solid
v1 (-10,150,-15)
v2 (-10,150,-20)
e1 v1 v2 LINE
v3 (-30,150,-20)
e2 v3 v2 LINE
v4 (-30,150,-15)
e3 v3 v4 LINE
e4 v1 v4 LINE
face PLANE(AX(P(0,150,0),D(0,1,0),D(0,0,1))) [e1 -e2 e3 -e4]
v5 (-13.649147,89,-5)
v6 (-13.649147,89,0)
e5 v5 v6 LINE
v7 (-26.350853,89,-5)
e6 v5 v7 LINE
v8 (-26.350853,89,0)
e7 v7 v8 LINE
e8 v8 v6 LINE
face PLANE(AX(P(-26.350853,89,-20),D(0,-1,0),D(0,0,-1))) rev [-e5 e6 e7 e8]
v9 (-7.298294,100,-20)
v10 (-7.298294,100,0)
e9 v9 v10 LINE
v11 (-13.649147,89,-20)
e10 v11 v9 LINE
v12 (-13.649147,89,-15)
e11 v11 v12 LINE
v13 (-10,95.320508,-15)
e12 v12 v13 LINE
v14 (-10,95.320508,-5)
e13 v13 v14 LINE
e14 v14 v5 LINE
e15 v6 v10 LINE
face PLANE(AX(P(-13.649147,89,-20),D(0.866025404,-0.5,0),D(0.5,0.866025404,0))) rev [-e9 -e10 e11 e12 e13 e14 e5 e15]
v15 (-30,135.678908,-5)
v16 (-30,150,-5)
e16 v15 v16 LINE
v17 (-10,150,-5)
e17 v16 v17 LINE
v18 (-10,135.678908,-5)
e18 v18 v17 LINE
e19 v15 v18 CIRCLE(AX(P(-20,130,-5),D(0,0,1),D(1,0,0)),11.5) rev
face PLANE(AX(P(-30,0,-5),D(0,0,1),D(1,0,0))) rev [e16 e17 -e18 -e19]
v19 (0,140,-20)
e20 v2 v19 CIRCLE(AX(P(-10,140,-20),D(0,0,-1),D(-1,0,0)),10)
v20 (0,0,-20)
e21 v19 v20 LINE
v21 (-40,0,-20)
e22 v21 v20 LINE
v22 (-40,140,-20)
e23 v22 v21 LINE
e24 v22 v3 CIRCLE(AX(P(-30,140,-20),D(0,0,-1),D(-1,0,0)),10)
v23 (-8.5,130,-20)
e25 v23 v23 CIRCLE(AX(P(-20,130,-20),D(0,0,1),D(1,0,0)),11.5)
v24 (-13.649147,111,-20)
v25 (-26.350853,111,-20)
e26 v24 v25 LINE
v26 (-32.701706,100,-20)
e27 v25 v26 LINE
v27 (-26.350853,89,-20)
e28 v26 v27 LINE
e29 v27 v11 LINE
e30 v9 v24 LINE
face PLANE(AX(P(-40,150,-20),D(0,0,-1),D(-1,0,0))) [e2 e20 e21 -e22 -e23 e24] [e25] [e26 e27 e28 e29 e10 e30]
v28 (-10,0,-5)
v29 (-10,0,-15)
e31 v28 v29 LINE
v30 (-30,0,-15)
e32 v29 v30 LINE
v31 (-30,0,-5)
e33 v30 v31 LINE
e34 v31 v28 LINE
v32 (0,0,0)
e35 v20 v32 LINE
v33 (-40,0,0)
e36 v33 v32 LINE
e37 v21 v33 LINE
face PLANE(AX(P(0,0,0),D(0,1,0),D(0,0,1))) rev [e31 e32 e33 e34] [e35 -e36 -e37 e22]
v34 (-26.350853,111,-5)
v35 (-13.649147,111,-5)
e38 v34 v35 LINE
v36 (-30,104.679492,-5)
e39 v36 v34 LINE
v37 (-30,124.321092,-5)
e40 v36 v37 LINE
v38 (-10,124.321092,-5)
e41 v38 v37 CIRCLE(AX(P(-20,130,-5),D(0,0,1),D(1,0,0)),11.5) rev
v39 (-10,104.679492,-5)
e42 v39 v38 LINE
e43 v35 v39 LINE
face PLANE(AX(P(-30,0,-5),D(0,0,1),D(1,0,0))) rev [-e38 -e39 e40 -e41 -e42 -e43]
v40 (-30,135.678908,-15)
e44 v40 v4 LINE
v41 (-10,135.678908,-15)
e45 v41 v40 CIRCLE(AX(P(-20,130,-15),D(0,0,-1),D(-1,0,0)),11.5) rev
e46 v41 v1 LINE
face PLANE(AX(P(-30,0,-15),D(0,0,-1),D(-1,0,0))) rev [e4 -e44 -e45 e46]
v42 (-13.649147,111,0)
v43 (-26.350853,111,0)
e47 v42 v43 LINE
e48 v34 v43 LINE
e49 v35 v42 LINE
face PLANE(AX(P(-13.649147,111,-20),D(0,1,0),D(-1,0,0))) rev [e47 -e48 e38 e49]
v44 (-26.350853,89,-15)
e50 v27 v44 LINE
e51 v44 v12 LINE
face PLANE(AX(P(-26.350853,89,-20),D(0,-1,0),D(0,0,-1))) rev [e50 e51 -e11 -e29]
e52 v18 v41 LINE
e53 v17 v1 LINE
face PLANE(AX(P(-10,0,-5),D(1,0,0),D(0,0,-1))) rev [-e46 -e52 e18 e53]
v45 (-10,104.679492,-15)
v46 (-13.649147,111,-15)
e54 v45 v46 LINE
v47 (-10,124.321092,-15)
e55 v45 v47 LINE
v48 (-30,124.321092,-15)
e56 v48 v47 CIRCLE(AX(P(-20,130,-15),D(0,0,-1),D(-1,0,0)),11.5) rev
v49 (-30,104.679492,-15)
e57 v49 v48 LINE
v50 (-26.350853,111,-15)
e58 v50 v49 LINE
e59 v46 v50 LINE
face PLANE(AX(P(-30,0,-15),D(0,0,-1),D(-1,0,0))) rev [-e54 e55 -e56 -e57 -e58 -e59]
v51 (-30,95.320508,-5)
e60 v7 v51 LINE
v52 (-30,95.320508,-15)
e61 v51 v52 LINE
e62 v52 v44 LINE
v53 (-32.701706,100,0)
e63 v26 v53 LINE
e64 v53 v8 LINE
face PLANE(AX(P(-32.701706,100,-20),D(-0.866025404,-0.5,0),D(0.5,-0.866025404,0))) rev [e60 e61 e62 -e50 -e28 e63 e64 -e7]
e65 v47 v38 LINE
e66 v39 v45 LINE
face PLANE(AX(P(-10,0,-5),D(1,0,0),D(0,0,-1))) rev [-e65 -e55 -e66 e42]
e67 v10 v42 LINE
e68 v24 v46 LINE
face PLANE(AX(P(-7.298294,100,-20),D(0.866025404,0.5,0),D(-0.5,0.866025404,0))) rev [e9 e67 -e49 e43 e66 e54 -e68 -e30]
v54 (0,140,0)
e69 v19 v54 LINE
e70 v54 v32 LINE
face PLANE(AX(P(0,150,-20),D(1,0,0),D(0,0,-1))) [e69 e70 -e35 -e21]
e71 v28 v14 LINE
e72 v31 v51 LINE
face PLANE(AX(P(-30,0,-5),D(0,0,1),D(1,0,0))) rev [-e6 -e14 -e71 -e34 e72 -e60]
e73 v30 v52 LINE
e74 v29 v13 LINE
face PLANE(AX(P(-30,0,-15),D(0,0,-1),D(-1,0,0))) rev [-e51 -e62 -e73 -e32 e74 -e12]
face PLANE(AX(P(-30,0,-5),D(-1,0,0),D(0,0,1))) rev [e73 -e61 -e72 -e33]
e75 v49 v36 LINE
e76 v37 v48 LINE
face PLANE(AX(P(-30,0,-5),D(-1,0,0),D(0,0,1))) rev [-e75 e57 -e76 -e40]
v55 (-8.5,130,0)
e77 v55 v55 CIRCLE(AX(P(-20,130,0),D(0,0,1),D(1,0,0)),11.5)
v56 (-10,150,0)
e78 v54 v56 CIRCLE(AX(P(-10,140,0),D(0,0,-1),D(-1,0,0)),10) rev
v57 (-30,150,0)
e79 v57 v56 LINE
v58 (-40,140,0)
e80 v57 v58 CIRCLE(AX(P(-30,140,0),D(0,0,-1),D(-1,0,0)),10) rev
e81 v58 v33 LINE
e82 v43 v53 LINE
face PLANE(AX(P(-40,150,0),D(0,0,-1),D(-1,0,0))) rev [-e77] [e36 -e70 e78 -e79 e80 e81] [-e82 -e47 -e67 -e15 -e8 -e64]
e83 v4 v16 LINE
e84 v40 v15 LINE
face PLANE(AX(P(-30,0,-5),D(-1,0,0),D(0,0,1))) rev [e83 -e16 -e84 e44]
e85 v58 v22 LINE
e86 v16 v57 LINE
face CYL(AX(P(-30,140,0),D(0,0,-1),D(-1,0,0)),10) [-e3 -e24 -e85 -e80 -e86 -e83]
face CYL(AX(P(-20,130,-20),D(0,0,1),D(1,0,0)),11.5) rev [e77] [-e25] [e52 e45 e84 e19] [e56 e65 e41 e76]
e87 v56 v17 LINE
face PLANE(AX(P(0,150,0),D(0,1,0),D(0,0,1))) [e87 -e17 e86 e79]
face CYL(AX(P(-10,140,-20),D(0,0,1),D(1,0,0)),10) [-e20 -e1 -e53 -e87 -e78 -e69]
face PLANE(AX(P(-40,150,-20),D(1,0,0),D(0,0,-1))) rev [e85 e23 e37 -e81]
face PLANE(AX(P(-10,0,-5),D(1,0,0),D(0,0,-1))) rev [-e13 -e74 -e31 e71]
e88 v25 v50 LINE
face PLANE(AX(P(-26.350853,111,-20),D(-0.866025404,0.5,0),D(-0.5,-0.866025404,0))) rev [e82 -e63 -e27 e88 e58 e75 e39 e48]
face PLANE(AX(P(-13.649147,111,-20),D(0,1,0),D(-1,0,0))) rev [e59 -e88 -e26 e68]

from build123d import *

# Parameters (mm, degrees)
ESQUISSE1_W                  = 40
ESQUISSE1_H                  = 20
BOSS_EXTRU_2_DEPTH           = 150
ESQUISSE2_R                  = 11.5
ENL_V_MAT_EXTRU_1_DEPTH      = 157.524758425
ENL_V_MAT_EXTRU_2_DEPTH      = 157.524758425
ENL_V_MAT_EXTRU_3_DEPTH      = 157.524758425
ENL_V_MAT_EXTRU_3_DEPTH_BACK = 157.524758425
ESQUISSE4_W                  = 20
ESQUISSE4_H                  = 10
CONG_2_R                     = 10
CONG_5_R                     = 10


with BuildPart() as part:
    # Esquisse1 → Boss.-Extru.2 (new body)
    with BuildSketch(Plane(origin=(0, 0, 0), x_dir=(1, 0, 0), z_dir=(0, 1, 0))):
        with Locations((-20, 10)):
            Rectangle(ESQUISSE1_W, ESQUISSE1_H)
    extrude(amount=BOSS_EXTRU_2_DEPTH)

    # Esquisse2 → Enlèv. mat.-Extru.1 (cut, through all)
    with BuildSketch(Plane.XY):
        with Locations((-20, 130)):
            Circle(ESQUISSE2_R)
    extrude(amount=-ENL_V_MAT_EXTRU_1_DEPTH, mode=Mode.SUBTRACT)

    # Esquisse3 → Enlèv. mat.-Extru.2 (cut, through all)
    with BuildSketch(Plane.XY):
        Polygon((-26.350852961, 111), (-32.701705922, 100), (-26.350852961, 89), (-13.649147039, 89), (-7.298294078, 100), (-13.649147039, 111), align=None)
    extrude(amount=-ENL_V_MAT_EXTRU_2_DEPTH, mode=Mode.SUBTRACT)

    # Esquisse4 → Enlèv. mat.-Extru.3 (cut, two sides: drawn at the far end of the back side and taken through both)
    with BuildSketch(Plane(origin=(0, 150, 0), x_dir=(1, 0, 0), z_dir=(0, 1, 0)).offset(-ENL_V_MAT_EXTRU_3_DEPTH_BACK)):
        with Locations((-20, 10)):
            Rectangle(ESQUISSE4_W, ESQUISSE4_H)
    extrude(amount=ENL_V_MAT_EXTRU_3_DEPTH + ENL_V_MAT_EXTRU_3_DEPTH_BACK, mode=Mode.SUBTRACT)

    # Congé2
    cong_2_edges = [part.edges().sort_by_distance(p)[0] for p in [
        (0, 150, -10),
    ]]
    fillet(cong_2_edges, radius=CONG_2_R - 0.0001)  # a hair under: the kernel refuses the full size

    # Congé5
    cong_5_edges = [part.edges().sort_by_distance(p)[0] for p in [
        (-40, 150, -10),
    ]]
    fillet(cong_5_edges, radius=CONG_5_R - 0.0001)  # a hair under: the kernel refuses the full size


solid = part.part
